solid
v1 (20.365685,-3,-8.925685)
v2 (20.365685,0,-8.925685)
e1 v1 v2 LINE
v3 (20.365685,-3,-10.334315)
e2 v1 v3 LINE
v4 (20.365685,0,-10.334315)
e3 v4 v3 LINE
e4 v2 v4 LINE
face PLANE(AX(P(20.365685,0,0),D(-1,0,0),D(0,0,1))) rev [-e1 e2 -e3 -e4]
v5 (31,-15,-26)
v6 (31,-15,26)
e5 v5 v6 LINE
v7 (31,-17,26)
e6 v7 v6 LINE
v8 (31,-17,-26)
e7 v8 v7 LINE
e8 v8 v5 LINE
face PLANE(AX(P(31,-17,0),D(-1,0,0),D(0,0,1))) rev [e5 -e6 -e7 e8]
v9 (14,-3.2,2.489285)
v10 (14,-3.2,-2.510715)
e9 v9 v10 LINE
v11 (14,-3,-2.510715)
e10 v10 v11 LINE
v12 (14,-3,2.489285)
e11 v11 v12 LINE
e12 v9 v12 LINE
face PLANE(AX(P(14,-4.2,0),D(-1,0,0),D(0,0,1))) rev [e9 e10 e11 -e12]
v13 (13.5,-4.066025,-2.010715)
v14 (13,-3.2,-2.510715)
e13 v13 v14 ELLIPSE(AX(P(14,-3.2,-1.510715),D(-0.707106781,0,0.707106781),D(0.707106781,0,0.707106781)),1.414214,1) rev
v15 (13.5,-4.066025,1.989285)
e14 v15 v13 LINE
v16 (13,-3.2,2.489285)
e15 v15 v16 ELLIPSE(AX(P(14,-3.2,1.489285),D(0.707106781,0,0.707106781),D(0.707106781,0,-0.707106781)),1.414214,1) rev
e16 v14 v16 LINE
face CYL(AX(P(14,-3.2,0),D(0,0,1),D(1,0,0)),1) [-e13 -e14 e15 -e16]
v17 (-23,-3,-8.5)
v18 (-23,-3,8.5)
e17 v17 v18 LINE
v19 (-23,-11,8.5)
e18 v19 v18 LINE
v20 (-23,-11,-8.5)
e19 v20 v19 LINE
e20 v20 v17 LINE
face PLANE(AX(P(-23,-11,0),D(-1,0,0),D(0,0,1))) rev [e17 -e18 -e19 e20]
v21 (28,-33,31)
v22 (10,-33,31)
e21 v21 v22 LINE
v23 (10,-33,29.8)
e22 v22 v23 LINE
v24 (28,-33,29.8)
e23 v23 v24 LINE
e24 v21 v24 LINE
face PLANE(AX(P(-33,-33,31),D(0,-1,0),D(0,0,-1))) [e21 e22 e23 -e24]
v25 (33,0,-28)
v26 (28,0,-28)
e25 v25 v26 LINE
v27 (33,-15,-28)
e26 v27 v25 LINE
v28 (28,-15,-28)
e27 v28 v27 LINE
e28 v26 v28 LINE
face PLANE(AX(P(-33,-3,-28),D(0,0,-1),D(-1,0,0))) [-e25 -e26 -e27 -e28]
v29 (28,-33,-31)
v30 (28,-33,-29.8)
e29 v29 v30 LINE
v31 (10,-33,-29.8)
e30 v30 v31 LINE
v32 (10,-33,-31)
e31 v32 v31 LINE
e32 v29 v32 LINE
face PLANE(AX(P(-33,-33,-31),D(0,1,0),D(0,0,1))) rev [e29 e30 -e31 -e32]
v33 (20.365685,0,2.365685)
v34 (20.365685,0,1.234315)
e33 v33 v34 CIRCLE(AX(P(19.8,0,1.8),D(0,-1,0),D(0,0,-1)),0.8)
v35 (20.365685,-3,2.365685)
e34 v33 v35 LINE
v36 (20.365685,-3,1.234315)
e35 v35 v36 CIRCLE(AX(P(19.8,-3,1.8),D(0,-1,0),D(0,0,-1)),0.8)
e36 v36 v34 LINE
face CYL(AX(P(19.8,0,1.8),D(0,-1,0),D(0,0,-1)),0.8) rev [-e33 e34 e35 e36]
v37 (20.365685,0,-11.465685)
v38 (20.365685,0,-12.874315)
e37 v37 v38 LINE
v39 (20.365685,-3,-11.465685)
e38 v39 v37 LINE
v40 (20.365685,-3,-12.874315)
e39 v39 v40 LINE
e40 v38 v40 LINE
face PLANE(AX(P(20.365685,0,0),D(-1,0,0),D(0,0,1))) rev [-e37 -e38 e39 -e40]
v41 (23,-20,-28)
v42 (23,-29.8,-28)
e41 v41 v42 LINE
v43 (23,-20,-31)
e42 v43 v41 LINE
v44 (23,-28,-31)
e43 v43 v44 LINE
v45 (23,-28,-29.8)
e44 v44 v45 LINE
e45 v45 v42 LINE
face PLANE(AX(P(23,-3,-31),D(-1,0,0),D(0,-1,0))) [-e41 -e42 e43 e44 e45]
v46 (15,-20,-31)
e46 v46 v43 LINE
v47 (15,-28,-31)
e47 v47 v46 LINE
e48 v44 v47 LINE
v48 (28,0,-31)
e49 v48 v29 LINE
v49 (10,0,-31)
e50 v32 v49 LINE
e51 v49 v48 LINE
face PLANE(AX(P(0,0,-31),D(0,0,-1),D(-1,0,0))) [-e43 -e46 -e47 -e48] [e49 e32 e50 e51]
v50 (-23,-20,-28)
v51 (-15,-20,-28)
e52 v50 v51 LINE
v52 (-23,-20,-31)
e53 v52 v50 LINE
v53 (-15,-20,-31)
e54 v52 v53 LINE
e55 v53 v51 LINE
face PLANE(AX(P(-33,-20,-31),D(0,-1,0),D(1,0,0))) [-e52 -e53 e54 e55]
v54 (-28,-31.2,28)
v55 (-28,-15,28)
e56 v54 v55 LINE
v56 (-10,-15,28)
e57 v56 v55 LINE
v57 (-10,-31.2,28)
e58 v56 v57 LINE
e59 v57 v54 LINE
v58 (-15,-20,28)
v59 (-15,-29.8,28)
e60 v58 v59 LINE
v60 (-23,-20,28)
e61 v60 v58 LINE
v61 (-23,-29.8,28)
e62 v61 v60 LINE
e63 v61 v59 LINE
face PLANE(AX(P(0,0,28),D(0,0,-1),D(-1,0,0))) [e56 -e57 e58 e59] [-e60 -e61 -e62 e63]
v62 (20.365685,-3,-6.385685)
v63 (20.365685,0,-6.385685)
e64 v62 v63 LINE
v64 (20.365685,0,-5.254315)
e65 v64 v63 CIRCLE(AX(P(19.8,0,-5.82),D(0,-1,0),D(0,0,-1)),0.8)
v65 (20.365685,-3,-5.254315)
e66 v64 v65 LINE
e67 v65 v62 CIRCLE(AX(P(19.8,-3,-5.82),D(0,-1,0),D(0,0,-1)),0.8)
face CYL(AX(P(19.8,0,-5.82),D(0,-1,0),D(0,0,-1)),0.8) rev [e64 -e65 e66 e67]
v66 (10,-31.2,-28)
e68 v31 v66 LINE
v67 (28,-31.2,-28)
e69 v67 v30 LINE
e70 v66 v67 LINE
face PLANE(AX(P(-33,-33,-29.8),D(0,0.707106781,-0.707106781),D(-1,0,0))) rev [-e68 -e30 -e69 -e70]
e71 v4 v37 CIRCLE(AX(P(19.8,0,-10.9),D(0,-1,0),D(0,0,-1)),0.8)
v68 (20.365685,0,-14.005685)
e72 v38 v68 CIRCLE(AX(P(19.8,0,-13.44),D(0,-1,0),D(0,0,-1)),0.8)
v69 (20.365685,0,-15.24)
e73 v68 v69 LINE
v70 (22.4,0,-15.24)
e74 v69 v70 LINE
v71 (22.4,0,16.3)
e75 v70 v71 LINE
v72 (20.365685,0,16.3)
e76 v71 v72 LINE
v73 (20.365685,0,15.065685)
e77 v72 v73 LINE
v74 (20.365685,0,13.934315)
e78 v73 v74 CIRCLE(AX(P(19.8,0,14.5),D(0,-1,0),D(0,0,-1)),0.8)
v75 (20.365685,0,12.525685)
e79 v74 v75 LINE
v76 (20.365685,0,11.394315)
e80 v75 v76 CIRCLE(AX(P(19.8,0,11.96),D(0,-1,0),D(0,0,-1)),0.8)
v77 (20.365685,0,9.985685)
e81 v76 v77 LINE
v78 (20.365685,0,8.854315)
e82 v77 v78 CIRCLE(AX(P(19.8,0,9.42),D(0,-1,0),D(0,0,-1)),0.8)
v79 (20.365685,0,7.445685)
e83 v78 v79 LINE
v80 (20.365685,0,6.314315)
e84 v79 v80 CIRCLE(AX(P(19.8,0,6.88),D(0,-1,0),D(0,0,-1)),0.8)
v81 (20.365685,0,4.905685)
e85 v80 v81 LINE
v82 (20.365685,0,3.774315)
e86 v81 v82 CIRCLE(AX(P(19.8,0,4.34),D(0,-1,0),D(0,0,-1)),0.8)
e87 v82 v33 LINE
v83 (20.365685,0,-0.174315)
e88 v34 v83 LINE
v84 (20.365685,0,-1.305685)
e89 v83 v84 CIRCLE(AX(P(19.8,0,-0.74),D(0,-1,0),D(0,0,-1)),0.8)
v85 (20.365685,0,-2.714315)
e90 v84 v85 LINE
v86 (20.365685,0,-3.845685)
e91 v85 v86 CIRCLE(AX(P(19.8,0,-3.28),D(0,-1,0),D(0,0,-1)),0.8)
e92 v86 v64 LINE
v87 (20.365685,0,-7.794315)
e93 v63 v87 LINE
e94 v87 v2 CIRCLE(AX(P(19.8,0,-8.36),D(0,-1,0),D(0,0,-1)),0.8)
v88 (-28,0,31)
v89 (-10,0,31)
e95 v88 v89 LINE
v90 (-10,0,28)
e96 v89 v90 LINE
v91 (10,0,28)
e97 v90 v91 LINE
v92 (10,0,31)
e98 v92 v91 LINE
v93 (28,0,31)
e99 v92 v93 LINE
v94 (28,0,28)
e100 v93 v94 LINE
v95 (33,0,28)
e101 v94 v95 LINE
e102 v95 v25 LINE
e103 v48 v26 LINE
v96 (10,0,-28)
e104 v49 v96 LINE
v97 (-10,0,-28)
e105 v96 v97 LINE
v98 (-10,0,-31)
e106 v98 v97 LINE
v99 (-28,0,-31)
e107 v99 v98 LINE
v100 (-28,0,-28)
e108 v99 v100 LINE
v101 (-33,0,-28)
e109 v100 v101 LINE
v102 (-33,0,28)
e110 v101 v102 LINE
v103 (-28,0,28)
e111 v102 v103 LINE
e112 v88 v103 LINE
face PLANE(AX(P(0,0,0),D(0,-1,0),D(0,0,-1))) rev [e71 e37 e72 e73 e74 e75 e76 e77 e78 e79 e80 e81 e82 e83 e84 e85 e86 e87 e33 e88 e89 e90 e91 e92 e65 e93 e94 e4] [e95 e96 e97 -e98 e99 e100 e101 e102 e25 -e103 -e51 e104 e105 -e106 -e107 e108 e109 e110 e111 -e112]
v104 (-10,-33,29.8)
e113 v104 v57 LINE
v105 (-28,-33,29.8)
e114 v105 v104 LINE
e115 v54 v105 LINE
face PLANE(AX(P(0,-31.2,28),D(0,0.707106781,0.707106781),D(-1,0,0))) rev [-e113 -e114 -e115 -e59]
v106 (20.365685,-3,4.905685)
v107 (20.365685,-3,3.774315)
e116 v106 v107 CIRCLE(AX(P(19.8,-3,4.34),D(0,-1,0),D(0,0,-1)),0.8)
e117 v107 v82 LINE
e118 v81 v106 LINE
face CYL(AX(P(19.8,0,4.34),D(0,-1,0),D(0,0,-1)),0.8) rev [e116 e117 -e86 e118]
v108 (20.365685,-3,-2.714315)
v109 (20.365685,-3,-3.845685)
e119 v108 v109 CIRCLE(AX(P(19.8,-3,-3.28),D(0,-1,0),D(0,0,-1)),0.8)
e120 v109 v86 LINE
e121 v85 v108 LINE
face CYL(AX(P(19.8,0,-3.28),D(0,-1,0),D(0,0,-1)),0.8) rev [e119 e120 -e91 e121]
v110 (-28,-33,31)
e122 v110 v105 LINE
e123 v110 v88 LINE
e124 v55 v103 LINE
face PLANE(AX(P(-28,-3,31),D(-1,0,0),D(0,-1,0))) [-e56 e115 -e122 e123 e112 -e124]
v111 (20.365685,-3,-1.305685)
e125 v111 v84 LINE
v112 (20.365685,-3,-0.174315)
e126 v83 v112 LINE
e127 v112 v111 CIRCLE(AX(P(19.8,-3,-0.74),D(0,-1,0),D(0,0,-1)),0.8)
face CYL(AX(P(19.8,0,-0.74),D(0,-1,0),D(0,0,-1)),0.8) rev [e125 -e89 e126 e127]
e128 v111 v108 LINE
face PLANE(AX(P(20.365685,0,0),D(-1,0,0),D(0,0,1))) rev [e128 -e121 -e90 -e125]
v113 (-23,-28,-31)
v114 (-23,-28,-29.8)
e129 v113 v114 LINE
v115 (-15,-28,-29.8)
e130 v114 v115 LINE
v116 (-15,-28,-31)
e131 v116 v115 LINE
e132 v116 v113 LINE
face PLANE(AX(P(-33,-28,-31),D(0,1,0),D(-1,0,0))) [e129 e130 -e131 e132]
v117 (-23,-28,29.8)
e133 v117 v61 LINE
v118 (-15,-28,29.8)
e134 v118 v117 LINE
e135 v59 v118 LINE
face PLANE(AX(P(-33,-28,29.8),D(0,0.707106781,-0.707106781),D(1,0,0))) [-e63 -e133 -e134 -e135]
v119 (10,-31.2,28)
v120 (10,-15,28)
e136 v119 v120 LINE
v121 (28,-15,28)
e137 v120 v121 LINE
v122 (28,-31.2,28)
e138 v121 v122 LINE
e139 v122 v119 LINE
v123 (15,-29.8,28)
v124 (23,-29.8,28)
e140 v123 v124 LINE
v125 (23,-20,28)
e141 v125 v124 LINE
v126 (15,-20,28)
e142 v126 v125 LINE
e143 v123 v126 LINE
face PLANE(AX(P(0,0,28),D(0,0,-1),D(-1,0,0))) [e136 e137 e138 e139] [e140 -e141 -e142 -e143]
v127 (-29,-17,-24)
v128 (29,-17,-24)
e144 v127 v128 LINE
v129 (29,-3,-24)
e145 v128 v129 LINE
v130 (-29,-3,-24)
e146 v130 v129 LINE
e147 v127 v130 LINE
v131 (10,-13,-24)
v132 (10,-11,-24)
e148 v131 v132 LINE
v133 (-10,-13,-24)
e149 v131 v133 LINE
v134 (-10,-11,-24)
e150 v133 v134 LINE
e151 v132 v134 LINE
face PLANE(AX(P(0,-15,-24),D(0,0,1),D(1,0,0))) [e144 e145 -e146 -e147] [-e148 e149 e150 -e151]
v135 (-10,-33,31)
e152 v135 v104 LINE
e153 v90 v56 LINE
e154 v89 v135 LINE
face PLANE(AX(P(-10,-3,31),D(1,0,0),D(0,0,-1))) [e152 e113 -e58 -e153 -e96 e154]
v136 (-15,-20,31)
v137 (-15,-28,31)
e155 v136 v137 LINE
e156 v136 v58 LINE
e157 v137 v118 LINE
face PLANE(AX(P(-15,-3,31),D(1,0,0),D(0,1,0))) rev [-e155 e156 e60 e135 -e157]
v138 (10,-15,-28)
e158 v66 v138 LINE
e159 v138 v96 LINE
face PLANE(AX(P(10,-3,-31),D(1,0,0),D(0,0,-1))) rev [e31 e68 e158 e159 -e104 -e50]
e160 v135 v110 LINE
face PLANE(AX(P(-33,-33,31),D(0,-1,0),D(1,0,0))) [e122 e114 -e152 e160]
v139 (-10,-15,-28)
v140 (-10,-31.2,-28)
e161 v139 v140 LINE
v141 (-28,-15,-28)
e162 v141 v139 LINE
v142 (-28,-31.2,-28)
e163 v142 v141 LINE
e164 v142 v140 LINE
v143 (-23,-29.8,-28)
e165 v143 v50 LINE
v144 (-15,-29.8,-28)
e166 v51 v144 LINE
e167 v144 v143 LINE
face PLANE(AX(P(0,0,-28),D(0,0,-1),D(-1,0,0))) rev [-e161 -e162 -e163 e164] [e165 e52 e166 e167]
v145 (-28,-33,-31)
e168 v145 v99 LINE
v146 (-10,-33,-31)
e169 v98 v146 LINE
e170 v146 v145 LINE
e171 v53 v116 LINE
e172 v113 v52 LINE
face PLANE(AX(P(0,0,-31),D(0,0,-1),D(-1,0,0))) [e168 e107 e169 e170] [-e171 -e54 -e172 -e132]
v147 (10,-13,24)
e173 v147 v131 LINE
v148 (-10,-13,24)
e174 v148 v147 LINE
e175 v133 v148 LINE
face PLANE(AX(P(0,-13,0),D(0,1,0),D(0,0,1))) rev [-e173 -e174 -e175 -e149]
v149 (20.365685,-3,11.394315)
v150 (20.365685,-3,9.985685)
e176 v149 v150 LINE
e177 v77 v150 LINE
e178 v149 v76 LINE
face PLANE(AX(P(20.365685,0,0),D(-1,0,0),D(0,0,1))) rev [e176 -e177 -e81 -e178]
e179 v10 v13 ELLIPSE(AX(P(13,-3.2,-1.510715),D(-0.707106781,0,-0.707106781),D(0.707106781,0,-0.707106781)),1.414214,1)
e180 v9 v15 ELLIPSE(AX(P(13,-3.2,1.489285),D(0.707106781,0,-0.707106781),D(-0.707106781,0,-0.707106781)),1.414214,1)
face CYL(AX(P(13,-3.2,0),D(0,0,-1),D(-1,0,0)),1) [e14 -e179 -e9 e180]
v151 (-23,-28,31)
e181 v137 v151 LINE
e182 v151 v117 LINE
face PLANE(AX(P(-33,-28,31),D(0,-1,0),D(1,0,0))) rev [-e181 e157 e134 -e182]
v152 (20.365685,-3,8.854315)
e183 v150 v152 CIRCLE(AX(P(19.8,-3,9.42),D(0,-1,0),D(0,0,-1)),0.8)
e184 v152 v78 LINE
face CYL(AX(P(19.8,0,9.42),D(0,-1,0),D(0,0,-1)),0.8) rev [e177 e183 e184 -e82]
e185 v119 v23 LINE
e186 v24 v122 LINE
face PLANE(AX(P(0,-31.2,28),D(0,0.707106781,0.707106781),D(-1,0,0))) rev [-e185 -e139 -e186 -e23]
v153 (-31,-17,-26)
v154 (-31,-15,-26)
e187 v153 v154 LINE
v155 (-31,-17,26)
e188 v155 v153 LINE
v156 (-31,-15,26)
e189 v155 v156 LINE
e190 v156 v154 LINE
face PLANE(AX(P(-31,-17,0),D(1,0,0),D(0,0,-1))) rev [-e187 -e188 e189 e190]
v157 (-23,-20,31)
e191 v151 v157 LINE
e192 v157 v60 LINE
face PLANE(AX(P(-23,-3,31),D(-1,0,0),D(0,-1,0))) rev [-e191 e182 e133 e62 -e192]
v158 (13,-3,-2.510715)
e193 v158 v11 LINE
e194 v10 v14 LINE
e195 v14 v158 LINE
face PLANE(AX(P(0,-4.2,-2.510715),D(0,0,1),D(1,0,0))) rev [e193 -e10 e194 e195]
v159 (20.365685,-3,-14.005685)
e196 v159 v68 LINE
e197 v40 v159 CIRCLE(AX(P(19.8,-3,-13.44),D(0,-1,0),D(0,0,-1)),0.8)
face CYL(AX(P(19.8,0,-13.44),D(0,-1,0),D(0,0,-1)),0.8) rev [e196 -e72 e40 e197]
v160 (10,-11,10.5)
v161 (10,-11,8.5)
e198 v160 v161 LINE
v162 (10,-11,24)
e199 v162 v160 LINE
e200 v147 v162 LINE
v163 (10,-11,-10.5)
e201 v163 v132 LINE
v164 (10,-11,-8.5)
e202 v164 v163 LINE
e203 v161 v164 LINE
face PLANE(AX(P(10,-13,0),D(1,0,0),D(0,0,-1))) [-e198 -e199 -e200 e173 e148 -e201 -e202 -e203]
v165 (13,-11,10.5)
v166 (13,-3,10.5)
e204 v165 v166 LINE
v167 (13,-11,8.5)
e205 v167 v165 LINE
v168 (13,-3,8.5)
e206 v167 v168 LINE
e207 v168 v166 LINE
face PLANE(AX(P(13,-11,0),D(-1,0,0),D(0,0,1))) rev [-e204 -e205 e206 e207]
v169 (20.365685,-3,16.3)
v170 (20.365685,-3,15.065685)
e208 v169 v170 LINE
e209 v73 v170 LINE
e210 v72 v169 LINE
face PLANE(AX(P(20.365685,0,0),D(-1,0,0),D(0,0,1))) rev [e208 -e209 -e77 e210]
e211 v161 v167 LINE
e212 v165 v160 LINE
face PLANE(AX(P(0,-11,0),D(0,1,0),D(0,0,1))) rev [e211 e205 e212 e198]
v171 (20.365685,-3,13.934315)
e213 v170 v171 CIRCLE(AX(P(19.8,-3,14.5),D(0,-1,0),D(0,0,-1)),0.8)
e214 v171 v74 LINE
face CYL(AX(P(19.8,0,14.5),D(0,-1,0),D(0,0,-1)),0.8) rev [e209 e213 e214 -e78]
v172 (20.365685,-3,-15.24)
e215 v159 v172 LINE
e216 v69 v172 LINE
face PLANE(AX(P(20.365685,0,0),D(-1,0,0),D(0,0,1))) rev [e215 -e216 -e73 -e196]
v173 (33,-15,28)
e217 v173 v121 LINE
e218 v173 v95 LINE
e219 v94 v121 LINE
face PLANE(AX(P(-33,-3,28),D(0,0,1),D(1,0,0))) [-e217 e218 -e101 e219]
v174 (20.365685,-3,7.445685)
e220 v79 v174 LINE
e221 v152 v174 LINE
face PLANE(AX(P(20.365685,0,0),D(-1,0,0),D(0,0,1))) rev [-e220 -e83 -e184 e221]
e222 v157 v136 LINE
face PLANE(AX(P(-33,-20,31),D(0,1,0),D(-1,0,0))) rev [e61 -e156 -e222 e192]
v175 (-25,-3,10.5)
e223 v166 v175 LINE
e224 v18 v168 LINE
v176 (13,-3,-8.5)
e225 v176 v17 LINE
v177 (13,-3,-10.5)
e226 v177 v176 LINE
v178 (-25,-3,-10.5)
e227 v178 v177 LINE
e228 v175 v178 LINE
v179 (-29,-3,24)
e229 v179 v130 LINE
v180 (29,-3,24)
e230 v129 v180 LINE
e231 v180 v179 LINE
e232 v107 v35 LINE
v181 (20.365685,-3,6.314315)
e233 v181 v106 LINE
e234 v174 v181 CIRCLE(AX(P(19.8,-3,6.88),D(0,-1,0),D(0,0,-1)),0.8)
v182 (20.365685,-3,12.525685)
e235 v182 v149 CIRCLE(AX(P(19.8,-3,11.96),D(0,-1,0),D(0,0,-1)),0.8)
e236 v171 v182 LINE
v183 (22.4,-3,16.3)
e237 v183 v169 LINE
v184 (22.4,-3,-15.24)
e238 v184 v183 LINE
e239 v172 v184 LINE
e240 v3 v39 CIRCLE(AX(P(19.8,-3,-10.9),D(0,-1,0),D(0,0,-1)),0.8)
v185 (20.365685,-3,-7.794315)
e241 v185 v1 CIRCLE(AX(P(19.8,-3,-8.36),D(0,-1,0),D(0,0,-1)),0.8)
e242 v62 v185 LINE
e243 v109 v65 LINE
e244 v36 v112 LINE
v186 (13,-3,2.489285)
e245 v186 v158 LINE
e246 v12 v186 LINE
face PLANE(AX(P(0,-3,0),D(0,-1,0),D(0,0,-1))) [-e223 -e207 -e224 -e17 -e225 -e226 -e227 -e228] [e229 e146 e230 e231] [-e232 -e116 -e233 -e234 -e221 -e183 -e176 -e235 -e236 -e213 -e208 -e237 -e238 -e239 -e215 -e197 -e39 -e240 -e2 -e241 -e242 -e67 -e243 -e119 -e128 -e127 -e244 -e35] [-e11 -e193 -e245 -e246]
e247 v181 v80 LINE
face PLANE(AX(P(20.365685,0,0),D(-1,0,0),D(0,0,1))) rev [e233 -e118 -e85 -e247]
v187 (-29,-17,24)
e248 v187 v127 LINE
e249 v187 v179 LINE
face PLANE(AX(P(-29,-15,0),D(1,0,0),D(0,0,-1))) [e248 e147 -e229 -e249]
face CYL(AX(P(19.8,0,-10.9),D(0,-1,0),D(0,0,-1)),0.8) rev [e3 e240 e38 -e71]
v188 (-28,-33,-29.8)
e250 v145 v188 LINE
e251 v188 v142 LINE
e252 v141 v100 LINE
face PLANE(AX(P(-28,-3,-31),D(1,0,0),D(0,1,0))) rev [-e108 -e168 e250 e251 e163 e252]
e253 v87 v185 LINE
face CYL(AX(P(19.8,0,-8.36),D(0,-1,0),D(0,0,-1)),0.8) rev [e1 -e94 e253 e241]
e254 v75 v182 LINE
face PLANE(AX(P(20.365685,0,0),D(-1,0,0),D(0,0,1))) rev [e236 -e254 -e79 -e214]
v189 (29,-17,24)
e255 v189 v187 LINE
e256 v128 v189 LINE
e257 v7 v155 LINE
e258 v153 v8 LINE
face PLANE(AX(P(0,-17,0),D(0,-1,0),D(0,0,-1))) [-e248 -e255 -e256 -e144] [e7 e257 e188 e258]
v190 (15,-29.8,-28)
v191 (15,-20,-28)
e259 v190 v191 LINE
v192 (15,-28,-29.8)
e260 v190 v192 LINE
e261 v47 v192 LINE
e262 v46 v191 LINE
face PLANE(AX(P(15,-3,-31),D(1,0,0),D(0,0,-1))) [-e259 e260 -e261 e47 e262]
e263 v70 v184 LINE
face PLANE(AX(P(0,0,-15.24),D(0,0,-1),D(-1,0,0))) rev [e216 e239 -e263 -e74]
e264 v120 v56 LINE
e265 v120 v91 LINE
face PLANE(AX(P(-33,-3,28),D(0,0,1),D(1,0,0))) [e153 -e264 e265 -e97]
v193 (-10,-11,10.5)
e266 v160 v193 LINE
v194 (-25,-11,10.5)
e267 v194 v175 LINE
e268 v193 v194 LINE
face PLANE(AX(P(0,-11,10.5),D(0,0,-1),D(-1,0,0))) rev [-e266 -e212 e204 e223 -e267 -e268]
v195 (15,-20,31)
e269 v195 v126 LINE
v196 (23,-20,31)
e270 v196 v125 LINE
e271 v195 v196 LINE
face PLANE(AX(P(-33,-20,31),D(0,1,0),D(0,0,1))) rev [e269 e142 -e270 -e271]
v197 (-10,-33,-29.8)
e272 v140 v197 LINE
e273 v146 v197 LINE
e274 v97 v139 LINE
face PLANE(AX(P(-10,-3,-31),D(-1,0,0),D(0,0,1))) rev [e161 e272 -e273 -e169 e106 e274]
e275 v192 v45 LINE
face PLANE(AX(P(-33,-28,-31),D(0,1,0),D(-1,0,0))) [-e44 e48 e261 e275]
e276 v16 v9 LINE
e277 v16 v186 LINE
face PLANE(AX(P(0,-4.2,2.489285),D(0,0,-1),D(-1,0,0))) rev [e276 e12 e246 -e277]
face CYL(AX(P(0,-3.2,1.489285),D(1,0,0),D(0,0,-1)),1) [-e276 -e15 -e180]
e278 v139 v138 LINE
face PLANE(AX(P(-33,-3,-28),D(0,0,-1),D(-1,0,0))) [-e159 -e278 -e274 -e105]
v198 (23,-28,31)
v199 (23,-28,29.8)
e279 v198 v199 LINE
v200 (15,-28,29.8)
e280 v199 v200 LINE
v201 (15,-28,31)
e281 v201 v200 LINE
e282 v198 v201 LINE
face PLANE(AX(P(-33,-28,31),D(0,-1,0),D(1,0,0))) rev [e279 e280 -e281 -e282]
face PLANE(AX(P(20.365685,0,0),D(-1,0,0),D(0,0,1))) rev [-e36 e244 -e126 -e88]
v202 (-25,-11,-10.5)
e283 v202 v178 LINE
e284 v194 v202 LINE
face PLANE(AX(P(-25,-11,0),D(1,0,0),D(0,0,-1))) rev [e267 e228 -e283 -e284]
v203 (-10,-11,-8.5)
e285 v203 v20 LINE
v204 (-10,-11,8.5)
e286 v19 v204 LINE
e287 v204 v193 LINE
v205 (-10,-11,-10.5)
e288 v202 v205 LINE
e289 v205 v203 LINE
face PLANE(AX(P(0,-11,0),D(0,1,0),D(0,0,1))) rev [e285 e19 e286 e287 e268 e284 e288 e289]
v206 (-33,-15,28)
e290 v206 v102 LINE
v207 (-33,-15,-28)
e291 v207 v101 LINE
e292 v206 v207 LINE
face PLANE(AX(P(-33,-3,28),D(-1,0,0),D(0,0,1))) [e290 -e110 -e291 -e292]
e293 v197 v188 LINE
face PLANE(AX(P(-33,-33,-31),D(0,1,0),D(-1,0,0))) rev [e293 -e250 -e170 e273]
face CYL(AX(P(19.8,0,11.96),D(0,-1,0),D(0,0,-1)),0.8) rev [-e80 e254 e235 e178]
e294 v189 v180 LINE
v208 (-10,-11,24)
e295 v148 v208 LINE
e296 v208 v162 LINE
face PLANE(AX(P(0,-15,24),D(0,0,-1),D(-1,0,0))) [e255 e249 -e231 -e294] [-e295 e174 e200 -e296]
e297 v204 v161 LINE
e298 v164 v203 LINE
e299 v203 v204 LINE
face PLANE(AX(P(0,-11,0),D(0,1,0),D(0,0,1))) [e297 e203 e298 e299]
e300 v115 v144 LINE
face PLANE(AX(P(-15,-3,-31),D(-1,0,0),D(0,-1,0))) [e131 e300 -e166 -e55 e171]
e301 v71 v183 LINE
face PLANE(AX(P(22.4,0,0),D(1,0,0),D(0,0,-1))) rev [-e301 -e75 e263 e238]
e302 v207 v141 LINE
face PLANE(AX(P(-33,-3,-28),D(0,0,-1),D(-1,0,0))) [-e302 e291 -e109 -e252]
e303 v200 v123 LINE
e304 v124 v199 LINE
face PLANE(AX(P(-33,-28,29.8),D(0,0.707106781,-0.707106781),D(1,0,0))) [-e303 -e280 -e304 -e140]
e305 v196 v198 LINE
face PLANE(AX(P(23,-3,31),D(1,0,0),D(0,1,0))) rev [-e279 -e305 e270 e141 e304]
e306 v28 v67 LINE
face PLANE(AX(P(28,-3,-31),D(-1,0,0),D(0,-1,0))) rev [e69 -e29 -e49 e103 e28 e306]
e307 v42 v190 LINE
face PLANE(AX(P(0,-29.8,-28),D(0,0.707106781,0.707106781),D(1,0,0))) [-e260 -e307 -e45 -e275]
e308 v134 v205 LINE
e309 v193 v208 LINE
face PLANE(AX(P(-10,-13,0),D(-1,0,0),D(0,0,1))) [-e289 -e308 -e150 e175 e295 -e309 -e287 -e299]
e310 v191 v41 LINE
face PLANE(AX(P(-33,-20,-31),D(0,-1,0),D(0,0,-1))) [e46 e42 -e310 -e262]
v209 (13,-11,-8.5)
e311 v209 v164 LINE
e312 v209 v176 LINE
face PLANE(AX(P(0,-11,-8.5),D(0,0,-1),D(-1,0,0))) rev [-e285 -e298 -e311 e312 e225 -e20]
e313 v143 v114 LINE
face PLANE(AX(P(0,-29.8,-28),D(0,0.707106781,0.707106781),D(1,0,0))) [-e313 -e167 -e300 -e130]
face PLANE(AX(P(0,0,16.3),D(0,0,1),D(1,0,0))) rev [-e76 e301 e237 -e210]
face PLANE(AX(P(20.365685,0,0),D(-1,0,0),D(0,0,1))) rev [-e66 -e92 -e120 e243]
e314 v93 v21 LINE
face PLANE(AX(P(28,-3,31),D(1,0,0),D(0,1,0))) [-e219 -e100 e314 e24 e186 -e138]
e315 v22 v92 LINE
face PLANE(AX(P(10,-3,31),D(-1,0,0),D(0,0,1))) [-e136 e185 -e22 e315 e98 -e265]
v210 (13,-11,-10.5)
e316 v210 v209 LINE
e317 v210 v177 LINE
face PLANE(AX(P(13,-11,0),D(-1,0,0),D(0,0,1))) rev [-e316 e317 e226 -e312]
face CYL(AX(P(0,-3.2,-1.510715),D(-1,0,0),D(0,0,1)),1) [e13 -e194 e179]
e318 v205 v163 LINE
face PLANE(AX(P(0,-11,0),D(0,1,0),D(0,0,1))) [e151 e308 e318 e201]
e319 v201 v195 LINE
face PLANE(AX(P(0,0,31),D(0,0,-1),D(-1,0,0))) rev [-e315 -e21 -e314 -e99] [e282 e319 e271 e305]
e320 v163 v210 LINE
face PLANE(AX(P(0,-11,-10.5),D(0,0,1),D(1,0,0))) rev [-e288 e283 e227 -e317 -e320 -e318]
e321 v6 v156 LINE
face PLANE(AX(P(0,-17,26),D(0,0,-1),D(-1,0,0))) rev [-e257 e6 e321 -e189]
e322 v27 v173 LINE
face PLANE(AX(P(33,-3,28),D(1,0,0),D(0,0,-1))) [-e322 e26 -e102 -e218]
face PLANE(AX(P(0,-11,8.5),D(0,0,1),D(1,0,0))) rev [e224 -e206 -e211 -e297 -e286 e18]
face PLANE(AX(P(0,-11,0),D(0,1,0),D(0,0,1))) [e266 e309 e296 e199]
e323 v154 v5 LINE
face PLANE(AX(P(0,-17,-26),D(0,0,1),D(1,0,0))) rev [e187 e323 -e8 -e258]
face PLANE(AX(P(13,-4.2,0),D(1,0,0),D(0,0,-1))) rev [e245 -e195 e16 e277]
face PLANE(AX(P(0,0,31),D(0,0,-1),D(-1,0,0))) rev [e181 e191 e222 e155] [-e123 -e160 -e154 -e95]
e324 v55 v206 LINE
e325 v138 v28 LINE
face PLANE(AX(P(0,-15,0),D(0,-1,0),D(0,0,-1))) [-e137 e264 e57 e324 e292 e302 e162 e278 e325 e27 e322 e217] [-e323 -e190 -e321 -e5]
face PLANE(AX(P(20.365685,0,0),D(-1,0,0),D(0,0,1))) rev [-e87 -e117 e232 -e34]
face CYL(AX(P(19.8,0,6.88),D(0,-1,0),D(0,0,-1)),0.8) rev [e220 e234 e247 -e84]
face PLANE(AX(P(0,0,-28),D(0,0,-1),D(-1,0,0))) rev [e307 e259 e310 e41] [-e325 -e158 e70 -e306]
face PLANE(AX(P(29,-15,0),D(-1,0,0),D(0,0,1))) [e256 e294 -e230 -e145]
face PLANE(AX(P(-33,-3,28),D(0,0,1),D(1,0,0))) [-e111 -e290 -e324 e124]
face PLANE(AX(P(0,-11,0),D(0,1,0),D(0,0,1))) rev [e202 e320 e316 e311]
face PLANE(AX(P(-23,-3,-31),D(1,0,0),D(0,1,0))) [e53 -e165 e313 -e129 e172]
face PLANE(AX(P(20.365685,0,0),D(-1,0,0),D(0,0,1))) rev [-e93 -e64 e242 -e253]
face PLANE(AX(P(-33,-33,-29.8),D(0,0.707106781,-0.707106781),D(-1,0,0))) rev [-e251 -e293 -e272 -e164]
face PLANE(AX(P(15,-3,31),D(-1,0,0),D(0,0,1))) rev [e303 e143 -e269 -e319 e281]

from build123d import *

# Parameters (mm, degrees)
SKETCH1_W           = 66
SKETCH1_H           = 56
BASE_DEPTH          = 3
WALL1_START         = -3
SKETCH4_W           = 66
SKETCH4_H           = 56
SKETCH4_W_2         = 58
SKETCH4_H_2         = 48
WALL1_DEPTH         = 12
WALL2_START         = -15
SKETCH8_W           = 62
SKETCH8_H           = 52
SKETCH8_W_2         = 58
SKETCH8_H_2         = 48
WALL2_DEPTH         = 2
BATTERYWALL_START   = -3
BATTERYWALL_DEPTH   = 8
BATTERYHOLDER_START = -11
SKETCH10_W          = 20
SKETCH10_H          = 48
BATTERYHOLDER_DEPTH = 2
BATTERYNOTCH_START  = -3
SKETCH15_W          = 1
SKETCH15_H          = 5
BATTERYNOTCH_DEPTH  = 1.2
BATTERYNOTCH2_R     = 1
CLIPS1_START        = 28
SKETCH11_W          = 18
SKETCH11_H          = 33
SKETCH11_W_2        = 8
SKETCH11_H_2        = 8
CLIPS1_DEPTH        = 3
CLIPS2_START        = -28
SKETCH11_2_W        = 18
SKETCH11_2_H        = 33
SKETCH11_2_W_2      = 8
SKETCH11_2_H_2      = 8
CLIPS2_DEPTH        = 3
CHAMFER3_SIZE       = 1.8
WIRESLOTS_START     = -3
SKETCH12_R          = 0.8
WIRESLOTS_DEPTH     = 60.026779311
WIRESLOTS2_START    = -3
SKETCH13_W          = 2.034314575
SKETCH13_H          = 31.54
WIRESLOTS2_DEPTH    = 60.026779311


with BuildPart() as part:
    # Sketch1 → Base (new body)
    with BuildSketch(Plane(origin=(0, 0, 0), x_dir=(1, 0, 0), z_dir=(0, 1, 0))):
        Rectangle(SKETCH1_W, SKETCH1_H)
    extrude(amount=-BASE_DEPTH)

    # Sketch4 → Wall1 (add)
    with BuildSketch(Plane(origin=(0, 0, 0), x_dir=(1, 0, 0), z_dir=(0, 1, 0)).offset(WALL1_START)):
        Rectangle(SKETCH4_W, SKETCH4_H)
        Rectangle(SKETCH4_W_2, SKETCH4_H_2, mode=Mode.SUBTRACT)
    extrude(amount=-WALL1_DEPTH)

    # Sketch8 → Wall2 (add)
    with BuildSketch(Plane(origin=(0, 0, 0), x_dir=(1, 0, 0), z_dir=(0, 1, 0)).offset(WALL2_START)):
        Rectangle(SKETCH8_W, SKETCH8_H)
        Rectangle(SKETCH8_W_2, SKETCH8_H_2, mode=Mode.SUBTRACT)
    extrude(amount=-WALL2_DEPTH)

    # Sketch9 → BatteryWall (add)
    with BuildSketch(Plane(origin=(0, 0, 0), x_dir=(1, 0, 0), z_dir=(0, 1, 0)).offset(BATTERYWALL_START)):
        Polygon((-23, 8.5), (13, 8.5), (13, 10.5), (-25, 10.5), (-25, -10.5), (13, -10.5), (13, -8.5), (-23, -8.5), align=None)
    extrude(amount=-BATTERYWALL_DEPTH)

    # Sketch10 → BatteryHolder (add)
    with BuildSketch(Plane(origin=(0, 0, 0), x_dir=(1, 0, 0), z_dir=(0, 1, 0)).offset(BATTERYHOLDER_START)):
        Rectangle(SKETCH10_W, SKETCH10_H)
    extrude(amount=-BATTERYHOLDER_DEPTH)

    # Sketch15 → BatteryNotch (add)
    with BuildSketch(Plane(origin=(0, 0, 0), x_dir=(1, 0, 0), z_dir=(0, 1, 0)).offset(BATTERYNOTCH_START)):
        with Locations((13.5, 0.010715453)):
            Rectangle(SKETCH15_W, SKETCH15_H)
    extrude(amount=-BATTERYNOTCH_DEPTH)

    # BatteryNotch2
    # the kernel refuses this fillet: 1 mm, written as the material it takes off along each edge
    with BuildSketch(Plane(origin=(14, -4.2, 4.989284547), x_dir=(0, 1, 0), z_dir=(0, 0, -1)), Plane(origin=(13, -4.2, -5.010715453), x_dir=(0, 1, 0), z_dir=(0, 0, 1))) as batterynotch2_piece_1:
        with BuildLine():
            CenterArc((BATTERYNOTCH2_R, -BATTERYNOTCH2_R), BATTERYNOTCH2_R, 90, 90)
            Line((0, -BATTERYNOTCH2_R), (0, 0))
            Line((0, 0), (BATTERYNOTCH2_R, 0))
        make_face()
    extrude(amount=10, mode=Mode.SUBTRACT)
    with BuildSketch(Plane(origin=(10.5, -4.2, 2.489284547), x_dir=(0, 1, 0), z_dir=(1, 0, 0)), Plane(origin=(16.5, -4.2, -2.510715453), x_dir=(0, 1, 0), z_dir=(-1, 0, 0))) as batterynotch2_piece_2:
        with BuildLine():
            CenterArc((BATTERYNOTCH2_R, -BATTERYNOTCH2_R), BATTERYNOTCH2_R, 90, 90)
            Line((0, -BATTERYNOTCH2_R), (0, 0))
            Line((0, 0), (BATTERYNOTCH2_R, 0))
        make_face()
    extrude(amount=6, mode=Mode.SUBTRACT)

    # Sketch11 → Clips1 (add)
    # profile 1 of 2: a face of its own
    with BuildSketch(Plane.XY.offset(CLIPS1_START)):
        with Locations((-19, -16.5)):
            Rectangle(SKETCH11_W, SKETCH11_H)
        with Locations((-19, -24)):
            Rectangle(SKETCH11_W_2, SKETCH11_H_2, mode=Mode.SUBTRACT)
    # profile 2 of 2: a face of its own
    with BuildSketch(Plane.XY.offset(CLIPS1_START)):
        with Locations((19, -16.5)):
            Rectangle(SKETCH11_W, SKETCH11_H)
        with Locations((19, -24)):
            Rectangle(SKETCH11_W_2, SKETCH11_H_2, mode=Mode.SUBTRACT)
    extrude(amount=CLIPS1_DEPTH)

    # Sketch11<2> → Clips2 (add)
    # profile 1 of 2: a face of its own
    with BuildSketch(Plane.XY.offset(CLIPS2_START)):
        with Locations((-19, -16.5)):
            Rectangle(SKETCH11_2_W, SKETCH11_2_H)
        with Locations((-19, -24)):
            Rectangle(SKETCH11_2_W_2, SKETCH11_2_H_2, mode=Mode.SUBTRACT)
    # profile 2 of 2: a face of its own
    with BuildSketch(Plane.XY.offset(CLIPS2_START)):
        with Locations((19, -16.5)):
            Rectangle(SKETCH11_2_W, SKETCH11_2_H)
        with Locations((19, -24)):
            Rectangle(SKETCH11_2_W_2, SKETCH11_2_H_2, mode=Mode.SUBTRACT)
    extrude(amount=-CLIPS2_DEPTH)

    # Chamfer3
    chamfer3_edges = [part.edges().sort_by_distance(p)[0] for p in [
        (-19, -33, 28),
        (-19, -28, 28),
        (19, -33, 28),
        (19, -28, 28),
        (-19, -28, -28),
        (-19, -33, -28),
        (19, -28, -28),
        (19, -33, -28),
    ]]
    chamfer(chamfer3_edges, length=CHAMFER3_SIZE)

    # Sketch12 → WireSlots (cut, through all)
    with BuildSketch(Plane(origin=(0, 0, 0), x_dir=(1, 0, 0), z_dir=(0, 1, 0)).offset(WIRESLOTS_START)):
        with Locations(Location((19.8, -14.5, 0), (0, 0, 90))):
            Circle(SKETCH12_R)
        with Locations(Location((19.8, -11.96, 0), (0, 0, 90))):
            Circle(SKETCH12_R)
        with Locations(Location((19.8, -9.42, 0), (0, 0, 90))):
            Circle(SKETCH12_R)
        with Locations(Location((19.8, -6.88, 0), (0, 0, 90))):
            Circle(SKETCH12_R)
        with Locations(Location((19.8, -4.34, 0), (0, 0, 90))):
            Circle(SKETCH12_R)
        with Locations(Location((19.8, -1.8, 0), (0, 0, 90))):
            Circle(SKETCH12_R)
        with Locations(Location((19.8, 0.74, 0), (0, 0, 90))):
            Circle(SKETCH12_R)
        with Locations(Location((19.8, 3.28, 0), (0, 0, 90))):
            Circle(SKETCH12_R)
        with Locations(Location((19.8, 5.82, 0), (0, 0, 90))):
            Circle(SKETCH12_R)
        with Locations(Location((19.8, 8.36, 0), (0, 0, 90))):
            Circle(SKETCH12_R)
        with Locations(Location((19.8, 10.9, 0), (0, 0, 90))):
            Circle(SKETCH12_R)
        with Locations(Location((19.8, 13.44, 0), (0, 0, 90))):
            Circle(SKETCH12_R)
    extrude(amount=WIRESLOTS_DEPTH, mode=Mode.SUBTRACT)

    # Sketch13 → WireSlots2 (cut, through all)
    with BuildSketch(Plane(origin=(0, 0, 0), x_dir=(1, 0, 0), z_dir=(0, 1, 0)).offset(WIRESLOTS2_START)):
        with Locations((21.382842713, -0.53)):
            Rectangle(SKETCH13_W, SKETCH13_H)
    extrude(amount=WIRESLOTS2_DEPTH, mode=Mode.SUBTRACT)


solid = part.part
